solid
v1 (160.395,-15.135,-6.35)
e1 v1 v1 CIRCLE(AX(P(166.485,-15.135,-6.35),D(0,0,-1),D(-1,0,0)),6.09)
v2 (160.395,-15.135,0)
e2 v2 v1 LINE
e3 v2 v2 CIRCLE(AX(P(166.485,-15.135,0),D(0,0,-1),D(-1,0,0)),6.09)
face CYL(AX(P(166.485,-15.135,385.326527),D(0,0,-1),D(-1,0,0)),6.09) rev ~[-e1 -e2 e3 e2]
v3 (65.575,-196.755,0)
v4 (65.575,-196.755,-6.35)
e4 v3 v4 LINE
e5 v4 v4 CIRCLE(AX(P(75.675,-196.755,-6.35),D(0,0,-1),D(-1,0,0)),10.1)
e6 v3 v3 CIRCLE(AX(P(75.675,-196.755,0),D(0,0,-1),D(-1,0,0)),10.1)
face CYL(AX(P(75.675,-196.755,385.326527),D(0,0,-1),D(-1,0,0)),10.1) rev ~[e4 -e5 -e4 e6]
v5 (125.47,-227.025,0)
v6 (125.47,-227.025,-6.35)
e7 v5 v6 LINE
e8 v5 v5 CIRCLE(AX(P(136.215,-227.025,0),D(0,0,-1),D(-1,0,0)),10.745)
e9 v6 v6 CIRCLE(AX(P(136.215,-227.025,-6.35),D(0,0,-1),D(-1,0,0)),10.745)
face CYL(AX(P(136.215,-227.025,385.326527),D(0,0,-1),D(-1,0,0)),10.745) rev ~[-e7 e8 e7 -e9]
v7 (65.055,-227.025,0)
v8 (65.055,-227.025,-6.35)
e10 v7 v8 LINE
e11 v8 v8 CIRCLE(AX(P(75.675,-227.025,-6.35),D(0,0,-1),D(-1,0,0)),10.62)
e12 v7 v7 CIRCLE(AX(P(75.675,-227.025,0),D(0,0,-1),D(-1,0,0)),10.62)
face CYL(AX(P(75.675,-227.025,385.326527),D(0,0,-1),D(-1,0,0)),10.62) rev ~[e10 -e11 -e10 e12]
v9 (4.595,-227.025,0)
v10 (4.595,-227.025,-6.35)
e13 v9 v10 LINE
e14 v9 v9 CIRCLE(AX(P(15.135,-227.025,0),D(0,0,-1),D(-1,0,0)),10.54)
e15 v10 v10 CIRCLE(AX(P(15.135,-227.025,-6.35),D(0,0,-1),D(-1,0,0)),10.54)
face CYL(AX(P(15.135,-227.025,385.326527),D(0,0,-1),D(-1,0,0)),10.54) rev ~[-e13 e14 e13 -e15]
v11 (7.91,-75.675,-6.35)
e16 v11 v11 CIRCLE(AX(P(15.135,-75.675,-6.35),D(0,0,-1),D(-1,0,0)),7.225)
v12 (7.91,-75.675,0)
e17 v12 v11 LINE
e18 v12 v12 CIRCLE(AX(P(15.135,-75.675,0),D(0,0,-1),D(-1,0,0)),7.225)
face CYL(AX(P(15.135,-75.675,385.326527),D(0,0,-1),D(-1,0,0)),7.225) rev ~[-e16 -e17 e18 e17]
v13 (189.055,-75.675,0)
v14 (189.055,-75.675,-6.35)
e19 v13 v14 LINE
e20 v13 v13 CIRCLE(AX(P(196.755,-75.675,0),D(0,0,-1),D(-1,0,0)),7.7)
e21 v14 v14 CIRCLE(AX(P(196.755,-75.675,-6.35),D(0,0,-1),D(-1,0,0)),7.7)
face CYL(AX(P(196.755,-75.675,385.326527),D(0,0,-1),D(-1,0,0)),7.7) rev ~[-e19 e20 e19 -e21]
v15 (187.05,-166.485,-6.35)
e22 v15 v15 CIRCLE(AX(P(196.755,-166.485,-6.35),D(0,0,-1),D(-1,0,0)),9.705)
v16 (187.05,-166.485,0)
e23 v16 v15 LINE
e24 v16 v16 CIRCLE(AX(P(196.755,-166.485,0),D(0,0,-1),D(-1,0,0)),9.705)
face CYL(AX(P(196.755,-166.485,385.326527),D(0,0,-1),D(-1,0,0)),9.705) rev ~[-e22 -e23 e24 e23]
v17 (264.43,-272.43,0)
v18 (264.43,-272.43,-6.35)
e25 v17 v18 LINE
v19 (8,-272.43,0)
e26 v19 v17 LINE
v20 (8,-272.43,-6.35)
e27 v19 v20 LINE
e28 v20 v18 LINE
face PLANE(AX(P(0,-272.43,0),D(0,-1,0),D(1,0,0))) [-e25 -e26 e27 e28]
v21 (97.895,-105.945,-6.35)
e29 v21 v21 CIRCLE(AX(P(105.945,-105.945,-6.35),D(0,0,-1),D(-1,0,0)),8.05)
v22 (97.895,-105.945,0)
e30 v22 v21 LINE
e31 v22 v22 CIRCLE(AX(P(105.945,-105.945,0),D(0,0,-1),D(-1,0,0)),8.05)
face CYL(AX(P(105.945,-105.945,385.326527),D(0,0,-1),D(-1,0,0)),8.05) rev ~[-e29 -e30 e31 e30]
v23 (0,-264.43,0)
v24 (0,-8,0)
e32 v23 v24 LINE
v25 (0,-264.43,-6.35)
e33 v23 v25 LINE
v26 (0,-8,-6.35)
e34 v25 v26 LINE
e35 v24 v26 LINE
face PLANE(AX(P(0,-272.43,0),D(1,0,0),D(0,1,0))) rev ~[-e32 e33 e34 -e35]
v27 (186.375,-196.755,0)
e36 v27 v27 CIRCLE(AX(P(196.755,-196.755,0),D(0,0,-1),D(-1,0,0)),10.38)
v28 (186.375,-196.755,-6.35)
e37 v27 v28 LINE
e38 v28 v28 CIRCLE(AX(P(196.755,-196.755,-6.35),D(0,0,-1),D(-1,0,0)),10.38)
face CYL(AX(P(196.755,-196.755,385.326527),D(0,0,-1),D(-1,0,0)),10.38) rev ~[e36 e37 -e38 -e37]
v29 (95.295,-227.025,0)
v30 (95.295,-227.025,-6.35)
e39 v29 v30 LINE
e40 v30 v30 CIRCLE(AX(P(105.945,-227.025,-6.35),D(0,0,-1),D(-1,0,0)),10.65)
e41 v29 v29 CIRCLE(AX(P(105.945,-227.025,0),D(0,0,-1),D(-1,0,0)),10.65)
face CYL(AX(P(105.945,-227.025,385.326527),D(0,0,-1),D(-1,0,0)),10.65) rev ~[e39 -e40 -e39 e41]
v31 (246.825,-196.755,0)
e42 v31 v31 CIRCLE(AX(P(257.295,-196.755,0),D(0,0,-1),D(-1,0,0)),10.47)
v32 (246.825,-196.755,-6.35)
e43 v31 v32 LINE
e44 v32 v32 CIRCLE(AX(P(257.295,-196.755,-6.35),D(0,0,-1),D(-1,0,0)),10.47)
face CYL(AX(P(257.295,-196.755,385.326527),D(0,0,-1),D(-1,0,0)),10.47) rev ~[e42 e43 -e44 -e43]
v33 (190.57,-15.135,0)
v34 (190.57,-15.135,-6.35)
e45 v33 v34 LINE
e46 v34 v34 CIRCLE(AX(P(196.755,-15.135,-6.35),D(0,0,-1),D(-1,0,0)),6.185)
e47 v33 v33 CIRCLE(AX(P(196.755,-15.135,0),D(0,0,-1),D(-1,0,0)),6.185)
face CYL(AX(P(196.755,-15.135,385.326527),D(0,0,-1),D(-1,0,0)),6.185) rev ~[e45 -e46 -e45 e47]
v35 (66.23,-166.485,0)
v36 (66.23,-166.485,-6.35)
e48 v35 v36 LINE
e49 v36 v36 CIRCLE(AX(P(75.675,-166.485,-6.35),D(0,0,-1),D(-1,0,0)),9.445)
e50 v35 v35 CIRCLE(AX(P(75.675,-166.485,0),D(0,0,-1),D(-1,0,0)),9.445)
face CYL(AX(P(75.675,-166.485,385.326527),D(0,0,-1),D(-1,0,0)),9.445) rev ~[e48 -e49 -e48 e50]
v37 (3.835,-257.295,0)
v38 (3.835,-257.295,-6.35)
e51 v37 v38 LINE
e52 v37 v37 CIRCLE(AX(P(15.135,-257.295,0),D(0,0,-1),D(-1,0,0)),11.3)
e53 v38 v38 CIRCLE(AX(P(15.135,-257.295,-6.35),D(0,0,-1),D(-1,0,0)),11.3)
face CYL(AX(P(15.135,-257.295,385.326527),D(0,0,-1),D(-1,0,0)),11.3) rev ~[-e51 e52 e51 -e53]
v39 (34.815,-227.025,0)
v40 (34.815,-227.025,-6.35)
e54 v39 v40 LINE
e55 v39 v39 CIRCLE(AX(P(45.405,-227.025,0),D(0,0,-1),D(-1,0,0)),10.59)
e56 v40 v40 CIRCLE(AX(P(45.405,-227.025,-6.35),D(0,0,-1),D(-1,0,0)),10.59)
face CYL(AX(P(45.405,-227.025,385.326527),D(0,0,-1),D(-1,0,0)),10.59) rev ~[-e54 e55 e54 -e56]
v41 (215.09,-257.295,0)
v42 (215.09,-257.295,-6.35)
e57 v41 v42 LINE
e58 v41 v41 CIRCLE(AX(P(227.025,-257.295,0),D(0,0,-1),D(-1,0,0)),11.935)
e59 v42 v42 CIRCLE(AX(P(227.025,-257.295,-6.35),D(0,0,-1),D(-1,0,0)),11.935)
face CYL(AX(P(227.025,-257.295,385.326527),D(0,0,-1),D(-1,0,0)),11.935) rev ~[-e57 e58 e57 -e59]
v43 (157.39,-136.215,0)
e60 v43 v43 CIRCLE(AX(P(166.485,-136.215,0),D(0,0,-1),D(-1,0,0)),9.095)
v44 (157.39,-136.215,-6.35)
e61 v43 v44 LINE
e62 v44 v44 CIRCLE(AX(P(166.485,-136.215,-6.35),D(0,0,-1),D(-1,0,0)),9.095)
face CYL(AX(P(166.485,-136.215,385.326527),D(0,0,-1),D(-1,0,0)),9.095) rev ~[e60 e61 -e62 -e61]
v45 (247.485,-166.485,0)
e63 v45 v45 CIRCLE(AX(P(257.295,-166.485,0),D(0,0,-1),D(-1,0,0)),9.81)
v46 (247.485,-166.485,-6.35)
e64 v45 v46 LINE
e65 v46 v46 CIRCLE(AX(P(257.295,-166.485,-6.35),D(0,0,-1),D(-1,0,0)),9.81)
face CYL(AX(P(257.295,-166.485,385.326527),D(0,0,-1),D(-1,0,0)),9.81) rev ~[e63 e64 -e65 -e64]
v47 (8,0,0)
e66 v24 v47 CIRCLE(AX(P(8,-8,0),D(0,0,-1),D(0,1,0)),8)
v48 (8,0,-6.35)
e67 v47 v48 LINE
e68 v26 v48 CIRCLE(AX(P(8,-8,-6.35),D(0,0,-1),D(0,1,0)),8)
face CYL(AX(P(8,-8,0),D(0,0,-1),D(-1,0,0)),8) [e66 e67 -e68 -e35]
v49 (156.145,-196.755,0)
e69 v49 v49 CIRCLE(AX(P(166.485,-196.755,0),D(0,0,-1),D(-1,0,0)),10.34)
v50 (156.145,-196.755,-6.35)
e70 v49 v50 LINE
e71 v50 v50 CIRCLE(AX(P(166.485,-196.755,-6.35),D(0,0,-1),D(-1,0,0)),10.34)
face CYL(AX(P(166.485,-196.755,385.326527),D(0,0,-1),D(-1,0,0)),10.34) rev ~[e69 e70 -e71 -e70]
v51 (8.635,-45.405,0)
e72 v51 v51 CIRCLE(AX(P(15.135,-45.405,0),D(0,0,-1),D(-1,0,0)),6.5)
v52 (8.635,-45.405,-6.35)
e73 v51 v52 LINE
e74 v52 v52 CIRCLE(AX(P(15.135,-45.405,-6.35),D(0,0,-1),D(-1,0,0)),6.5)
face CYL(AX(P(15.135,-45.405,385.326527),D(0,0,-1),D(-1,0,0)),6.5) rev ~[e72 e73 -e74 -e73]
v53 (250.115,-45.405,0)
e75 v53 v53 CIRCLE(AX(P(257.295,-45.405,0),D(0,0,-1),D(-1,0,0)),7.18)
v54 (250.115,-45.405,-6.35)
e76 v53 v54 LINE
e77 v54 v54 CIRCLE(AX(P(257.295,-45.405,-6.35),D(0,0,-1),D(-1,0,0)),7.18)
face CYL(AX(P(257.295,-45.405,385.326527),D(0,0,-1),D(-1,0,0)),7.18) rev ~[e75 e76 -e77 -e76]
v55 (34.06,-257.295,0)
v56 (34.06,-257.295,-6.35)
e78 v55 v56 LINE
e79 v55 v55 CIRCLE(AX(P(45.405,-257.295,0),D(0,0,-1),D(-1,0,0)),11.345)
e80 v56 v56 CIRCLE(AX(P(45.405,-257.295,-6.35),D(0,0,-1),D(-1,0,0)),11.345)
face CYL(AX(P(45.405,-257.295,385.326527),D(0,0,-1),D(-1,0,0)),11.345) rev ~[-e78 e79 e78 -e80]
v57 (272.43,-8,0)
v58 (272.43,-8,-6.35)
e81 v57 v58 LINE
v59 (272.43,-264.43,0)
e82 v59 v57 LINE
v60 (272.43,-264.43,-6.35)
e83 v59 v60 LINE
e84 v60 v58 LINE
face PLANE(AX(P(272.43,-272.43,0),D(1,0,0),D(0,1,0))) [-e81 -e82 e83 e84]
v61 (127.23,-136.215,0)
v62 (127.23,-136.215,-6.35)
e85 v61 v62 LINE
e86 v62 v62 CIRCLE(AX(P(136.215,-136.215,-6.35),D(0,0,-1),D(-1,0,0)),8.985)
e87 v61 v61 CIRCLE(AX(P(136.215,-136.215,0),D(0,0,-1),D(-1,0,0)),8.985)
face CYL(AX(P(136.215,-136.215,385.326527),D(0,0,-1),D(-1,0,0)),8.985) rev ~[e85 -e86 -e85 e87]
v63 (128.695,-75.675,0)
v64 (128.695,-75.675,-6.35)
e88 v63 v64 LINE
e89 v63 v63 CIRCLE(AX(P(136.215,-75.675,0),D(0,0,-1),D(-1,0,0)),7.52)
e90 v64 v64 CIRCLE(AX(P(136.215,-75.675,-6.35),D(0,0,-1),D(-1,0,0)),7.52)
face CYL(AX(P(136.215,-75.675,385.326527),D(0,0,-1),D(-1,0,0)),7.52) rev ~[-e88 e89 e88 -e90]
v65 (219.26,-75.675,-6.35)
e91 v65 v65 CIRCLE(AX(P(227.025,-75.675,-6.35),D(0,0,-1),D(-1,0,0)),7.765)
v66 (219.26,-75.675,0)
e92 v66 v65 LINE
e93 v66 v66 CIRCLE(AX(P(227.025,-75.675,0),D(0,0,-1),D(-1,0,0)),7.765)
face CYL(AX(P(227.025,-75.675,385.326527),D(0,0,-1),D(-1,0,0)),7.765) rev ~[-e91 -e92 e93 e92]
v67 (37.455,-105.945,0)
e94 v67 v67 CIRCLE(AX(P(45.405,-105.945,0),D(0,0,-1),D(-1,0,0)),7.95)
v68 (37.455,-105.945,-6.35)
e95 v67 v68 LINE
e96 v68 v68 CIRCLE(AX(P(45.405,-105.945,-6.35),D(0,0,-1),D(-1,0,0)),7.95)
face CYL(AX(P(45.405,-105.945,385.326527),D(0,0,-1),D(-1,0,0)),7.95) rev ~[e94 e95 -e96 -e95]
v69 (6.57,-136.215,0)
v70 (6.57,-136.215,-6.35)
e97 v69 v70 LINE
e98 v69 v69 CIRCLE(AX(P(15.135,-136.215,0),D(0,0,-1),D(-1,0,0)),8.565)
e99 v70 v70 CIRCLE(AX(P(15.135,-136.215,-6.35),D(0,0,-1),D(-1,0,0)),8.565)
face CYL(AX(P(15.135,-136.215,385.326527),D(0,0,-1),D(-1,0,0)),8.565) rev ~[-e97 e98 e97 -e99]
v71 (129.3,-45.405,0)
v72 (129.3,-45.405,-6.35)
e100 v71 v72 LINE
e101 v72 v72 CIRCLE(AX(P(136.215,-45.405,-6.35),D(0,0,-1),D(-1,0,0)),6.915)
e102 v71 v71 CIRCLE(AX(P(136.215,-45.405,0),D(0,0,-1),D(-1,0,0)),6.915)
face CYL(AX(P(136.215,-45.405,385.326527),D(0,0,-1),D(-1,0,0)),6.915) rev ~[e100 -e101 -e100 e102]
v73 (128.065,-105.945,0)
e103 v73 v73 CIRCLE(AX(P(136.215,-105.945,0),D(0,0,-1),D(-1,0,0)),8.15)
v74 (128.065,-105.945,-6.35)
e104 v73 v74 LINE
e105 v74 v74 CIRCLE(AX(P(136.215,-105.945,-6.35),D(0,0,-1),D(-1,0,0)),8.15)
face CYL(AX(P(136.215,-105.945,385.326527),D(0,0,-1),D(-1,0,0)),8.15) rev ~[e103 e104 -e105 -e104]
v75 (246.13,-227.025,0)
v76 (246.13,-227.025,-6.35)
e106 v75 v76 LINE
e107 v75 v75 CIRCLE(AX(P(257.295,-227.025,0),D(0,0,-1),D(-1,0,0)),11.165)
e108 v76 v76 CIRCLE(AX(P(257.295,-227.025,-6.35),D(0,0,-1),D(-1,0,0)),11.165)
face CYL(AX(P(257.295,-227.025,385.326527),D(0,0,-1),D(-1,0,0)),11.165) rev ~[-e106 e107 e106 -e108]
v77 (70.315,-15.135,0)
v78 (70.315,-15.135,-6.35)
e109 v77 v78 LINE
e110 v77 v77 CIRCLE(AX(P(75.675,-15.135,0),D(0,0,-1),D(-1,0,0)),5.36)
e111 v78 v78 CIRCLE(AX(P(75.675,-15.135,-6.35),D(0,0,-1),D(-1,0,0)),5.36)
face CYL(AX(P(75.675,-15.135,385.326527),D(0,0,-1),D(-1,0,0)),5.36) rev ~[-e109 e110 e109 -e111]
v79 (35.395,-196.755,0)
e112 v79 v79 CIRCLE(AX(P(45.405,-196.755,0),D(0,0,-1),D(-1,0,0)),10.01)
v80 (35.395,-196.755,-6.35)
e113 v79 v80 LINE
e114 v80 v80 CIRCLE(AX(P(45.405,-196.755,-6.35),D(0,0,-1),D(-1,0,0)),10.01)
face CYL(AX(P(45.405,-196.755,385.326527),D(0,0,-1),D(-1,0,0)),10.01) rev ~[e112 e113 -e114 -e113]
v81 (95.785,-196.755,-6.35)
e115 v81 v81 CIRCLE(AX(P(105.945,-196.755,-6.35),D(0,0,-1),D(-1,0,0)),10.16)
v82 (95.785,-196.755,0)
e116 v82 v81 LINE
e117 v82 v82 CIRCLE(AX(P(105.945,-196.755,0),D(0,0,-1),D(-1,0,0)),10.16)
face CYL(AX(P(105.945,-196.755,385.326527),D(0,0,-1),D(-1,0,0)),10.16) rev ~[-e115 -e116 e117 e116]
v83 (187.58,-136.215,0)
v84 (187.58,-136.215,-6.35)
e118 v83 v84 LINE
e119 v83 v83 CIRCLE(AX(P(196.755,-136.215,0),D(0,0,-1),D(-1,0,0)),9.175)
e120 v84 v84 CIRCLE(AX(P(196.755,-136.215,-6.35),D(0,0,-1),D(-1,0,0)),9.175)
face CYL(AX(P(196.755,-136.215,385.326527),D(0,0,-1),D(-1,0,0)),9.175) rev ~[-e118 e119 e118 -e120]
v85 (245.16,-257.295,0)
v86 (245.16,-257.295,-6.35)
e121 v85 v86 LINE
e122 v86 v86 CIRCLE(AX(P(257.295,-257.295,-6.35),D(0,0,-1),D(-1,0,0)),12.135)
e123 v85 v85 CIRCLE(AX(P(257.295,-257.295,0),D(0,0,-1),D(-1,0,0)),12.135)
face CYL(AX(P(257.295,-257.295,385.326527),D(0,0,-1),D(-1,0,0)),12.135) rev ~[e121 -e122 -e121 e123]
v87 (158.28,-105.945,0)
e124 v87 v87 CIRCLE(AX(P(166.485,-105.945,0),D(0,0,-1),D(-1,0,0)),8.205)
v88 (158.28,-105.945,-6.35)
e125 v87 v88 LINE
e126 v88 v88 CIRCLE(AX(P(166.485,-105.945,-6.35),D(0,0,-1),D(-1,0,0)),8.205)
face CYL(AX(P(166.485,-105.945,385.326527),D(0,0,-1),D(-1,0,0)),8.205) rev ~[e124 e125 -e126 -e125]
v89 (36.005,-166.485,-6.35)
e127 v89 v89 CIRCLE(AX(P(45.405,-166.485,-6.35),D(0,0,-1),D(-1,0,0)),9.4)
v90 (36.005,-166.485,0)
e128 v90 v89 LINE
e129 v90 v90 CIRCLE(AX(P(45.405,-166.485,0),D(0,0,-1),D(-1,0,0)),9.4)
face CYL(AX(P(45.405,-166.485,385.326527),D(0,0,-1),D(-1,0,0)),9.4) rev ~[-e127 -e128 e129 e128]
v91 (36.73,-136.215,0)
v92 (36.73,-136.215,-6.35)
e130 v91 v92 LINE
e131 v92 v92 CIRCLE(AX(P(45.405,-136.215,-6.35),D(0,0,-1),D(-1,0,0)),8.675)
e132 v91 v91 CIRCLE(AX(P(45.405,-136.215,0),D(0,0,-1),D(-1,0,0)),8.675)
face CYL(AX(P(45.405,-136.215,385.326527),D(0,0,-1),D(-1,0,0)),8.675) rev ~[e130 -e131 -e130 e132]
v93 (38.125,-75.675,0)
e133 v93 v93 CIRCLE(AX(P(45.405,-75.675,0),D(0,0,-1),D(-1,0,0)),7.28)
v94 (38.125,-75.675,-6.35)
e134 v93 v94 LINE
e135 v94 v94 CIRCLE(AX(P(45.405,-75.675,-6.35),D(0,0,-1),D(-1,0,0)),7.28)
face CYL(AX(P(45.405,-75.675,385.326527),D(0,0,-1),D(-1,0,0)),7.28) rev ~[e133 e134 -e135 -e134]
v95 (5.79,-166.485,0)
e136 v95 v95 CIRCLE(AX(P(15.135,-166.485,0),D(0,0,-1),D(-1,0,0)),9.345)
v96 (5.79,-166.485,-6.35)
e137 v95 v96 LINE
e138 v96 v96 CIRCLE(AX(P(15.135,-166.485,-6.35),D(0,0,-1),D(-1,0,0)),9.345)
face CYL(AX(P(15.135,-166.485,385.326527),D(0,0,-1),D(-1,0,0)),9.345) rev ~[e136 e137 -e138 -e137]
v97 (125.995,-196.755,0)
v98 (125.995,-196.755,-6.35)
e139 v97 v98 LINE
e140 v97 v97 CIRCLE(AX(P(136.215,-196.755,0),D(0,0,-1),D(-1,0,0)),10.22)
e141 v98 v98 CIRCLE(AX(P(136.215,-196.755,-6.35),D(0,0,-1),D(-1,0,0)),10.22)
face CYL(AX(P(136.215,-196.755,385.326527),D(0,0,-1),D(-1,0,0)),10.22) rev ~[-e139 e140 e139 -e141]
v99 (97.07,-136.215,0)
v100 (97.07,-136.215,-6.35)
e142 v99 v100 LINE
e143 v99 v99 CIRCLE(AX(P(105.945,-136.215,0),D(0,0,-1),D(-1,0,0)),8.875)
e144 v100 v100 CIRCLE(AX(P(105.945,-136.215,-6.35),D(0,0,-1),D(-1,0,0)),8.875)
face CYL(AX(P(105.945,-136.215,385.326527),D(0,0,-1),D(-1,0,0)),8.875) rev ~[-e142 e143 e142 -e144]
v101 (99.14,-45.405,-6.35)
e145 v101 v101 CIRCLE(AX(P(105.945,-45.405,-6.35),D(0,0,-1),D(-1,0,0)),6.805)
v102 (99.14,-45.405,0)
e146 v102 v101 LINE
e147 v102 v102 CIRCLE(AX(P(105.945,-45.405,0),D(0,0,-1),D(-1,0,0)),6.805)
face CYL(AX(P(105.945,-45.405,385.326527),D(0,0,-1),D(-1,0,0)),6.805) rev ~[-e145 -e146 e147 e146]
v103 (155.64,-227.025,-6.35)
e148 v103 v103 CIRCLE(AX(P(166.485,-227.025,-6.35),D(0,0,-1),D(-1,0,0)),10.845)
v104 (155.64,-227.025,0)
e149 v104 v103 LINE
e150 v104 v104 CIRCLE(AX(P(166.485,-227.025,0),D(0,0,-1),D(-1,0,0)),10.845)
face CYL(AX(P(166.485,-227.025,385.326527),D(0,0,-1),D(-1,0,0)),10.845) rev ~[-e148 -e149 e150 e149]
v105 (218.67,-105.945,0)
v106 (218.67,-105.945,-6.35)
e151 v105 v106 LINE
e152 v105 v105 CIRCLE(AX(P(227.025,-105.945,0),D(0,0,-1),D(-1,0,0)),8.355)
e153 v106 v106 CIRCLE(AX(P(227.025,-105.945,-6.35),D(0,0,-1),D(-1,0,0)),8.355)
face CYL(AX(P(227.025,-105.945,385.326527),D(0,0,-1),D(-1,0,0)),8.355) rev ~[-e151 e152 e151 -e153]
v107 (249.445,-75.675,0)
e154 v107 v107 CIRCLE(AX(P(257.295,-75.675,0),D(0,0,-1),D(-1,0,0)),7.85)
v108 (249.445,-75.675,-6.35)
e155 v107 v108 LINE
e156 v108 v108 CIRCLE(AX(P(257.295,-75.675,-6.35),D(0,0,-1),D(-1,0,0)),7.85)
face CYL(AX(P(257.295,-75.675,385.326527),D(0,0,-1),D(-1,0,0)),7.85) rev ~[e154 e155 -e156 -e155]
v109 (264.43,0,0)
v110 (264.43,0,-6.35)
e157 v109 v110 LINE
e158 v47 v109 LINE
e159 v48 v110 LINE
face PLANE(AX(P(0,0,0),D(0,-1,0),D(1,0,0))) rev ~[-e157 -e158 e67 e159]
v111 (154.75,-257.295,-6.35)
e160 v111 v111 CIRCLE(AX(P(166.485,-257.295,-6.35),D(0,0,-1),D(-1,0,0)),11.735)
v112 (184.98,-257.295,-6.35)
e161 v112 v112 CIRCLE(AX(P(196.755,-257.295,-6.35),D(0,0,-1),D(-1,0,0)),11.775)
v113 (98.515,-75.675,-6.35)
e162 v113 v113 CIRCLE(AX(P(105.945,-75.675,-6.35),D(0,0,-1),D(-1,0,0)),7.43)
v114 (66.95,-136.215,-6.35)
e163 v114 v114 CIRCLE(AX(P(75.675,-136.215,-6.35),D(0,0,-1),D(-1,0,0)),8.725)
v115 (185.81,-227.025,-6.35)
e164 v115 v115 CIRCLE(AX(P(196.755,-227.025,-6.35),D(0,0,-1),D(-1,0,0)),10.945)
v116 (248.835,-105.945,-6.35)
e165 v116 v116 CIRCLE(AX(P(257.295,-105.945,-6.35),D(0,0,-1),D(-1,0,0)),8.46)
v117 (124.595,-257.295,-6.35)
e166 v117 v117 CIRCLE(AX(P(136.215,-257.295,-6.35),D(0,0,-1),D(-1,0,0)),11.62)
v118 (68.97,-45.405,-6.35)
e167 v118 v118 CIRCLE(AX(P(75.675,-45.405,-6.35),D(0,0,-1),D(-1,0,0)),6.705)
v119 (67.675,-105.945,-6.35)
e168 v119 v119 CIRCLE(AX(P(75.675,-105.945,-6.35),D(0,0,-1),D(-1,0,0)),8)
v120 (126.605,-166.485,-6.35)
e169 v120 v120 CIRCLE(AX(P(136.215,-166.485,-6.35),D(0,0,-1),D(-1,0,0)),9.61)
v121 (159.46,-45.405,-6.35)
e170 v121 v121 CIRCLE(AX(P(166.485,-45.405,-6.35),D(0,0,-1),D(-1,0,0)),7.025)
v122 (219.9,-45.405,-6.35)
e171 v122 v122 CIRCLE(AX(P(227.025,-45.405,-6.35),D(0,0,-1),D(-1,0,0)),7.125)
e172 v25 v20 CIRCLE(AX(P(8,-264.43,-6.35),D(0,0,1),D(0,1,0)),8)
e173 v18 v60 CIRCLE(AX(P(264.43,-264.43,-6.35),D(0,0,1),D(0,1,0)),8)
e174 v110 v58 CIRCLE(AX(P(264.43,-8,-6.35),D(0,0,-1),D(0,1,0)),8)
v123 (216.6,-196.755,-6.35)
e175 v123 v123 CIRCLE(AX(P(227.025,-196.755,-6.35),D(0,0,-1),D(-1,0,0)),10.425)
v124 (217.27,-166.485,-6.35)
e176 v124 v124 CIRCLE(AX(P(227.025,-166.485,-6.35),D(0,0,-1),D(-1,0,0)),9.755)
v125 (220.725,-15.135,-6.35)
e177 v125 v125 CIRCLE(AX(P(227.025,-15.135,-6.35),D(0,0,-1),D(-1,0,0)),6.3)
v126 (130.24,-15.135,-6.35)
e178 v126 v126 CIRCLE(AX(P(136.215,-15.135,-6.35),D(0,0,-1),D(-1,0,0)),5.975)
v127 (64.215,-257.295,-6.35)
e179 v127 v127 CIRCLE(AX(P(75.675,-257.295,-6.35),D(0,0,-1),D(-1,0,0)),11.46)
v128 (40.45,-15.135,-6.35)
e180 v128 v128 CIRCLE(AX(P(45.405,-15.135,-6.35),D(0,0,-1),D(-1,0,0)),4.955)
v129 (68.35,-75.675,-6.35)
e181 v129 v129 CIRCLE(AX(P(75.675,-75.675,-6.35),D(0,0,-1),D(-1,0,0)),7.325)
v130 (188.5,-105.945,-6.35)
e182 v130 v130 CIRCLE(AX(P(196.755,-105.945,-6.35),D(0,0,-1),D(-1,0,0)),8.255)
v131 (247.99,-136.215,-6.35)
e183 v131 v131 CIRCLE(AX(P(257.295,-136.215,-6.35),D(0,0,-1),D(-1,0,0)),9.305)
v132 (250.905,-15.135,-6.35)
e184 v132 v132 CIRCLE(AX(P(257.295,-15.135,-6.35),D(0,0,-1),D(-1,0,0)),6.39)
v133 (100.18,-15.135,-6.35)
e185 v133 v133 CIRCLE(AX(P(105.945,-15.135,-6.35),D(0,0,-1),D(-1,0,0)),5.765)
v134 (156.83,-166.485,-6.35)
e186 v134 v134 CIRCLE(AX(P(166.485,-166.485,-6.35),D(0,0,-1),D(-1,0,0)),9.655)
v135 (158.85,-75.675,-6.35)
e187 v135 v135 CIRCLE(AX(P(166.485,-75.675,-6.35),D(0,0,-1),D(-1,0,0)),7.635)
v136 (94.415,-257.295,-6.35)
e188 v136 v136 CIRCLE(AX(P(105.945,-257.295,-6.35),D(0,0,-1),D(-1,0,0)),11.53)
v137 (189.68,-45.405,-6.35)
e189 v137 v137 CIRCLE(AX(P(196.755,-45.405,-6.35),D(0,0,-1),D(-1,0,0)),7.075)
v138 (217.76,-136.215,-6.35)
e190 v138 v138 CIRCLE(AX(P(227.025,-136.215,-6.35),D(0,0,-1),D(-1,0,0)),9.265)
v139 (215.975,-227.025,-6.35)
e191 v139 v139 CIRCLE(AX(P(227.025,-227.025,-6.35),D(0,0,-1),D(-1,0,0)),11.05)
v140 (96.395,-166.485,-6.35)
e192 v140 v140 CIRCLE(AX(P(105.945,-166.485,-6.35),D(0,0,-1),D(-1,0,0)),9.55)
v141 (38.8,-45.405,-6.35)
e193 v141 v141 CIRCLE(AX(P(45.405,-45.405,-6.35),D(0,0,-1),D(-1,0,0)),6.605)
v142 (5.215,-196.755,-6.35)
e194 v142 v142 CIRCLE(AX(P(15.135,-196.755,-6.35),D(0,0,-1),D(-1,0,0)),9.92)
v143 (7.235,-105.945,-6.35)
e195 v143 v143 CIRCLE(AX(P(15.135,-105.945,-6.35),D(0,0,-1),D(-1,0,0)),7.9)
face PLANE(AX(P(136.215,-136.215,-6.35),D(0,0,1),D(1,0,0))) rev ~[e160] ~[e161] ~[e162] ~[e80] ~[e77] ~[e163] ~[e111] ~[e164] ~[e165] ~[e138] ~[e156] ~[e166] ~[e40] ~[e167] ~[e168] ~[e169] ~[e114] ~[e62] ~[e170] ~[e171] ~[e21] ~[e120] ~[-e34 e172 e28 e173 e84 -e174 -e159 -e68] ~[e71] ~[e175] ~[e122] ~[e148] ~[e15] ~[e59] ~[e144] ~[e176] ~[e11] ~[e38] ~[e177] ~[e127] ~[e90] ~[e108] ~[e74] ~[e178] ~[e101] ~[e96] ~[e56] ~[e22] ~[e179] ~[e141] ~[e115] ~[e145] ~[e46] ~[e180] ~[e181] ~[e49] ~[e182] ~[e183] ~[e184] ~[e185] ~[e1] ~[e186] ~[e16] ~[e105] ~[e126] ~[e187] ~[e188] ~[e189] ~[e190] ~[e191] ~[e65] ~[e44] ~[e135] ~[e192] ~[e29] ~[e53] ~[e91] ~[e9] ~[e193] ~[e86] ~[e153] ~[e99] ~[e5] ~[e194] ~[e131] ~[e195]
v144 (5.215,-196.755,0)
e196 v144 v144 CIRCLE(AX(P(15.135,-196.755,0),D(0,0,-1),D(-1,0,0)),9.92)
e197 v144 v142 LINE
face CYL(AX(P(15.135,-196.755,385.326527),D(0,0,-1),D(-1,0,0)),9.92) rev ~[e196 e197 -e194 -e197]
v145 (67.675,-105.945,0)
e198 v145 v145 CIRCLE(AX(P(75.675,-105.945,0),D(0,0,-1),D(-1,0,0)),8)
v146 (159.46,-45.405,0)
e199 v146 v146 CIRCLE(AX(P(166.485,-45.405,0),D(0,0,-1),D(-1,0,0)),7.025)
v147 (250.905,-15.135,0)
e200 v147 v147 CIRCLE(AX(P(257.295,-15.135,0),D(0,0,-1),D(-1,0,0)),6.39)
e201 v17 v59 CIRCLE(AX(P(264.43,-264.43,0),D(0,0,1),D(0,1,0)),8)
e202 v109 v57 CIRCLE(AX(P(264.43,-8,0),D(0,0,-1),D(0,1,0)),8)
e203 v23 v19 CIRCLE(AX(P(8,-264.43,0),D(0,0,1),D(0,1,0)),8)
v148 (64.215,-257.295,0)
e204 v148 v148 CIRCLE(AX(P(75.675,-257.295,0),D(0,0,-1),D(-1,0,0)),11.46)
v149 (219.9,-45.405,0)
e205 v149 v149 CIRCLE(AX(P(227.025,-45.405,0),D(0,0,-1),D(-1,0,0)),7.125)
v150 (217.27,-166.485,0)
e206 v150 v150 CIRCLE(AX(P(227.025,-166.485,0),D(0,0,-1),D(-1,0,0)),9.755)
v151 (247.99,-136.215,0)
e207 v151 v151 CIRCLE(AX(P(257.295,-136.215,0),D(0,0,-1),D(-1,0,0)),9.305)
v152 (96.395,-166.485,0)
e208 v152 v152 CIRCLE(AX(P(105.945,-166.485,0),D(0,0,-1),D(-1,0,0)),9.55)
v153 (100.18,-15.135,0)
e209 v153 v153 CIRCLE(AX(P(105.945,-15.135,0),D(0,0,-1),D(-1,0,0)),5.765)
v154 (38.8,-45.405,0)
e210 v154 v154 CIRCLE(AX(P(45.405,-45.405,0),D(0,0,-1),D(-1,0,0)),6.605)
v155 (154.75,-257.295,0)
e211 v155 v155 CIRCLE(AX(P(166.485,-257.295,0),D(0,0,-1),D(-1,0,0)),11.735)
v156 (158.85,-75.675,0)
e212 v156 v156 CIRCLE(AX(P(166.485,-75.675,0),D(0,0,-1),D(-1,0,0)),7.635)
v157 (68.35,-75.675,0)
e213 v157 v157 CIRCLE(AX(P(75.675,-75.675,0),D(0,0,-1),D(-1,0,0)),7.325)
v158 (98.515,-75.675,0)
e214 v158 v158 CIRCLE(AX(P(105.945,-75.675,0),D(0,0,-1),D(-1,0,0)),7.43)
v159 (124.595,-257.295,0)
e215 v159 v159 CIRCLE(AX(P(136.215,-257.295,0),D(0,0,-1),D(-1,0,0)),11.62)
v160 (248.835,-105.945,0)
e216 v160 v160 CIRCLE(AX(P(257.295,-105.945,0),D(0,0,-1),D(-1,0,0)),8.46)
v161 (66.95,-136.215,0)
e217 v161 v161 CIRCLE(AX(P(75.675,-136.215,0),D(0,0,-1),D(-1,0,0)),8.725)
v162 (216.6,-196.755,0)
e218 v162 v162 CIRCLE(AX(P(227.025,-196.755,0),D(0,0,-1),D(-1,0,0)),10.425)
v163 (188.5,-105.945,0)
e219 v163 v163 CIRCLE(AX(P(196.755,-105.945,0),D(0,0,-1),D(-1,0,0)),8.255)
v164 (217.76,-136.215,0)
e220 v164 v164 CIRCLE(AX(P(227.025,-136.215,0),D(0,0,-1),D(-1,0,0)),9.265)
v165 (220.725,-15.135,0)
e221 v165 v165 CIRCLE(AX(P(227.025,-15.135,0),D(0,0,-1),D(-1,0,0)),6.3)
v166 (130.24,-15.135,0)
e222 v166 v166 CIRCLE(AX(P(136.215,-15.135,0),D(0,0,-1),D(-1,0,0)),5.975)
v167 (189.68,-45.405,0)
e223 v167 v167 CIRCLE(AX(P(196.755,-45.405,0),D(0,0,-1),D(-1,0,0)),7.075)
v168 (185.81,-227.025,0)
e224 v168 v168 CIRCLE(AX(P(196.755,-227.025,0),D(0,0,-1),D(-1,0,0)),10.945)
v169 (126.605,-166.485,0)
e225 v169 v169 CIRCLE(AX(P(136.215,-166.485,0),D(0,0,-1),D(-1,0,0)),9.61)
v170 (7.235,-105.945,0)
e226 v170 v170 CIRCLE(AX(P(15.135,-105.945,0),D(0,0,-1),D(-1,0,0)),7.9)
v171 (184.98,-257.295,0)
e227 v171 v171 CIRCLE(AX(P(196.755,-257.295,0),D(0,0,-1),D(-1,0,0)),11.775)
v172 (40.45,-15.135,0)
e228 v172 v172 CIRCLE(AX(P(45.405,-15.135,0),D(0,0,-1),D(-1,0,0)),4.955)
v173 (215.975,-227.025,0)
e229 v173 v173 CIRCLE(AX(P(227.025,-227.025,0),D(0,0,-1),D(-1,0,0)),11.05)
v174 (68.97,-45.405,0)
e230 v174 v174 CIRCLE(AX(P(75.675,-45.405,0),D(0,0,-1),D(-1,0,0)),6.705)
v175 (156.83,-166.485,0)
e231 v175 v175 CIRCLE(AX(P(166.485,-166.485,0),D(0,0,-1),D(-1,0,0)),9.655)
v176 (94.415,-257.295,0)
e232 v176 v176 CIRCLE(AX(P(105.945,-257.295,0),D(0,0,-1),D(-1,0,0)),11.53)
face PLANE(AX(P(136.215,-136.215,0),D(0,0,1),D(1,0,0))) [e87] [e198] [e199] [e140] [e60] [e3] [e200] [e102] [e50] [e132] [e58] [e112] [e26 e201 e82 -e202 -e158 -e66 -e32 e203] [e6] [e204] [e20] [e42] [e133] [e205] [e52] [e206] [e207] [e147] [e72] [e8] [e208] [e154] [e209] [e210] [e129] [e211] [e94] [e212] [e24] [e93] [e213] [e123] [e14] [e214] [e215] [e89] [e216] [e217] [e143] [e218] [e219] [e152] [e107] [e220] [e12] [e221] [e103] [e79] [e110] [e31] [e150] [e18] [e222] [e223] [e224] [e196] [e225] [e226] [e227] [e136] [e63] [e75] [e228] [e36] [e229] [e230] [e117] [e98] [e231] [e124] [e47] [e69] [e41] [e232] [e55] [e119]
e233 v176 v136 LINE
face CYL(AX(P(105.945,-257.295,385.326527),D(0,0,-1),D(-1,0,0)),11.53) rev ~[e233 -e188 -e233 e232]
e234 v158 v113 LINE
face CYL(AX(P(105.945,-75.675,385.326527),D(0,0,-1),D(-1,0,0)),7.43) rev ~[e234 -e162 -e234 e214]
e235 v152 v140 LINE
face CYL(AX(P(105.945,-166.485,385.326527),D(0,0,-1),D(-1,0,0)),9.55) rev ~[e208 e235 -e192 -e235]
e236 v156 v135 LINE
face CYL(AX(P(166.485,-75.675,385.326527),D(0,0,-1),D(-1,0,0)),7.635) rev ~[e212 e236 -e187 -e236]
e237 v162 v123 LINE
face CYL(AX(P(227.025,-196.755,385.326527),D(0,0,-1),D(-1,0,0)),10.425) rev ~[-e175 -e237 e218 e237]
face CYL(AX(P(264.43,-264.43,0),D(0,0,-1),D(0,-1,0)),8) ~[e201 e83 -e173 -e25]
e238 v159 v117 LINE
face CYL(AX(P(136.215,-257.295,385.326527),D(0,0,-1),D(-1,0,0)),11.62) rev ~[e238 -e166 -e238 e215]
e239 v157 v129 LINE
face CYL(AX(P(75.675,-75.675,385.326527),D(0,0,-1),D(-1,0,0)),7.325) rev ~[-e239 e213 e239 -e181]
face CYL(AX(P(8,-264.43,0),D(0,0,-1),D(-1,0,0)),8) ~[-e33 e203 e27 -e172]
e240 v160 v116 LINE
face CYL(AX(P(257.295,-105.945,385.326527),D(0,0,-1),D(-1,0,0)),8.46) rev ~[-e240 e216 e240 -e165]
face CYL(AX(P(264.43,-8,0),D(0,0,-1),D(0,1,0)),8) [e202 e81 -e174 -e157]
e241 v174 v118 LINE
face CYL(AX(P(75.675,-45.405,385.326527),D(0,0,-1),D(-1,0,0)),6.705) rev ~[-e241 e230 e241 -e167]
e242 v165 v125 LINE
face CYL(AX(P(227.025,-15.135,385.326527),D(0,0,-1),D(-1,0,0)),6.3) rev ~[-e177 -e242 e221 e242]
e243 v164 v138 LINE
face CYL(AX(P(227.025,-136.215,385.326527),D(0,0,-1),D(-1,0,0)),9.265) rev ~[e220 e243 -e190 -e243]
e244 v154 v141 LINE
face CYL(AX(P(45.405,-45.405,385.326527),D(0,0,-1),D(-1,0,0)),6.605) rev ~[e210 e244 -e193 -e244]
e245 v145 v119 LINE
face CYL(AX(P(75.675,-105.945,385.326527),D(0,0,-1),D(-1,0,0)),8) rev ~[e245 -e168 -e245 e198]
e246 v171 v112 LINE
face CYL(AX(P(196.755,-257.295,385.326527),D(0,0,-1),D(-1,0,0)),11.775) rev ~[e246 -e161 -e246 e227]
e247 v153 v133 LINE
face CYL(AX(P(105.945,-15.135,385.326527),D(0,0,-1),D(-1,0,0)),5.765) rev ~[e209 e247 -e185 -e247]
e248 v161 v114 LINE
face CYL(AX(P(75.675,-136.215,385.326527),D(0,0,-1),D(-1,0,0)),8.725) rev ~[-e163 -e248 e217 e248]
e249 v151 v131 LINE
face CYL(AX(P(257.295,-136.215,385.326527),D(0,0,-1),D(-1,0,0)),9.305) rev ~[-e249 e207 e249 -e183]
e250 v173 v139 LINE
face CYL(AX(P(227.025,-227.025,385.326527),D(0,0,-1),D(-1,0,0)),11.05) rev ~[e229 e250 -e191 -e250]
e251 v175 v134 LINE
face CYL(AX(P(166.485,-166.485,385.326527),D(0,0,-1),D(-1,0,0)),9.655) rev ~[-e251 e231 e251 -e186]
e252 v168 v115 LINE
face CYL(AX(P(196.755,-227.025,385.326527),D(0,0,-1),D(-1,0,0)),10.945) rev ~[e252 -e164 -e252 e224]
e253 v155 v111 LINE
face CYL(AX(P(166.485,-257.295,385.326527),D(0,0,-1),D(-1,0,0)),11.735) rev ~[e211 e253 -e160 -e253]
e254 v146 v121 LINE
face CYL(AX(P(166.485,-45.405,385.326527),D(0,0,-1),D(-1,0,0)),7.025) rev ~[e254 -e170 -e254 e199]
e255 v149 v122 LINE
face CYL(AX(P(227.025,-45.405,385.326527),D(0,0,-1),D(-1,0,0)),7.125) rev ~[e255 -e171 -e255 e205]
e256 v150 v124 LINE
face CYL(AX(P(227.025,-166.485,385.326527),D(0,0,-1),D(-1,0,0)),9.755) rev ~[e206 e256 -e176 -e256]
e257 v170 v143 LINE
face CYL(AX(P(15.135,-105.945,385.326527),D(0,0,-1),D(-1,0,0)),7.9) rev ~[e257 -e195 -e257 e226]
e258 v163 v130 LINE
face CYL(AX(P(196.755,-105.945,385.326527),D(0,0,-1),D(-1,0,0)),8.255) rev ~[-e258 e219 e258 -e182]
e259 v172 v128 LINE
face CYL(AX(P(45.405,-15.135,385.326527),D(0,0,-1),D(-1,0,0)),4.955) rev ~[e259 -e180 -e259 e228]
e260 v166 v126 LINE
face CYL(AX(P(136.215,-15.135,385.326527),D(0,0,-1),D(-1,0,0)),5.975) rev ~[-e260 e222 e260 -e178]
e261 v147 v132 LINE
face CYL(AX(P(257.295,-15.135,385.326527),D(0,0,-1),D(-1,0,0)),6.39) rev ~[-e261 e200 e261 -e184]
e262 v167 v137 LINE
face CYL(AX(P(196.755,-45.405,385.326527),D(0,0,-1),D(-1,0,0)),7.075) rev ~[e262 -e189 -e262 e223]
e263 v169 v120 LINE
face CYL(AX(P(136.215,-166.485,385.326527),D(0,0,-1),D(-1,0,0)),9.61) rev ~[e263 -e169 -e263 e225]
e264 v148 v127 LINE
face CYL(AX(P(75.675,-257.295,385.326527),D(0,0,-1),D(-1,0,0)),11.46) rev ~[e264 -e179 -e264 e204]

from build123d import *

# Parameters (mm, degrees)
F1_W     = 272.43
F1_H     = 272.43
F2_DEPTH = 6.35
F3_D     = 9.91
F4_D     = 10.72
F5_D     = 11.53
F6_D     = 11.95
F7_D     = 12.18
F8_D     = 12.37
F9_D     = 12.6
F10_D    = 12.78
F11_D    = 13
F12_D    = 13.21
F13_D    = 13.41
F14_D    = 13.61
F15_D    = 13.83
F16_D    = 14.05
F17_D    = 14.15
F18_D    = 14.25
F19_D    = 14.36
F20_D    = 14.45
F21_D    = 14.56
F22_D    = 14.65
F23_D    = 14.86
F24_D    = 15.04
F25_D    = 15.27
F26_D    = 15.4
F27_D    = 15.53
F28_D    = 15.7
F29_D    = 15.8
F30_D    = 15.9
F31_D    = 16
F32_D    = 16.1
F33_D    = 16.3
F34_D    = 16.41
F35_D    = 16.51
F36_D    = 16.71
F37_D    = 16.92
F38_D    = 17.13
F39_D    = 17.35
F40_R    = 8
F41_D    = 17.45
F42_D    = 17.75
F43_D    = 17.97
F44_D    = 18.19
F45_D    = 18.35
F46_D    = 18.53
F47_D    = 18.61
F48_D    = 18.69
F49_D    = 18.8
F50_D    = 18.89
F51_D    = 19.1
F52_D    = 19.22
F53_D    = 19.31
F54_D    = 19.41
F55_D    = 19.51
F56_D    = 19.62
F57_D    = 19.84
F58_D    = 20.02
F59_D    = 20.2
F60_D    = 20.32
F61_D    = 20.44
F62_D    = 20.68
F63_D    = 20.76
F64_D    = 20.85
F65_D    = 20.94
F66_D    = 21.08
F67_D    = 21.18
F68_D    = 21.24
F69_D    = 21.3
F70_D    = 21.49
F71_D    = 21.69
F72_D    = 21.89
F73_D    = 22.1
F74_D    = 22.33
F75_D    = 22.6
F76_D    = 22.69
F77_D    = 22.92
F78_D    = 23.06
F79_D    = 23.24
F80_D    = 23.47
F81_D    = 23.55
F82_D    = 23.87
F83_D    = 24.27


# Not quite as in the source:
# - a length typed as a fraction of an inch, garbled in the dataset ("3 / 203.2 mm" for 3/8 in), is restored


with BuildPart() as f2:
    # F1 (on Top) → F2 (new body)
    with BuildSketch(Plane.XY):
        with Locations((136.215, -136.215)):
            Rectangle(F1_W, F1_H)
    extrude(amount=-F2_DEPTH)

    # F3 (through all)
    with Locations(Plane.XY):
        with Locations((45.405, -15.135)):
            Hole(F3_D / 2)

    # F4 (through all)
    with Locations(Plane.XY):
        with Locations((75.675, -15.135)):
            Hole(F4_D / 2)

    # F5 (through all)
    with Locations(Plane.XY):
        with Locations((105.945, -15.135)):
            Hole(F5_D / 2)

    # F6 (through all)
    with Locations(Plane.XY):
        with Locations((136.215, -15.135)):
            Hole(F6_D / 2)

    # F7 (through all)
    with Locations(Plane.XY):
        with Locations((166.485, -15.135)):
            Hole(F7_D / 2)

    # F8 (through all)
    with Locations(Plane.XY):
        with Locations((196.755, -15.135)):
            Hole(F8_D / 2)

    # F9 (through all)
    with Locations(Plane.XY):
        with Locations((227.025, -15.135)):
            Hole(F9_D / 2)

    # F10 (through all)
    with Locations(Plane.XY):
        with Locations((257.295, -15.135)):
            Hole(F10_D / 2)

    # F11 (through all)
    with Locations(Plane.XY):
        with Locations((15.135, -45.405)):
            Hole(F11_D / 2)

    # F12 (through all)
    with Locations(Plane.XY):
        with Locations((45.405, -45.405)):
            Hole(F12_D / 2)

    # F13 (through all)
    with Locations(Plane.XY):
        with Locations((75.675, -45.405)):
            Hole(F13_D / 2)

    # F14 (through all)
    with Locations(Plane.XY):
        with Locations((105.945, -45.405)):
            Hole(F14_D / 2)

    # F15 (through all)
    with Locations(Plane.XY):
        with Locations((136.215, -45.405)):
            Hole(F15_D / 2)

    # F16 (through all)
    with Locations(Plane.XY):
        with Locations((166.485, -45.405)):
            Hole(F16_D / 2)

    # F17 (through all)
    with Locations(Plane.XY):
        with Locations((196.755, -45.405)):
            Hole(F17_D / 2)

    # F18 (through all)
    with Locations(Plane.XY):
        with Locations((227.025, -45.405)):
            Hole(F18_D / 2)

    # F19 (through all)
    with Locations(Plane.XY):
        with Locations((257.295, -45.405)):
            Hole(F19_D / 2)

    # F20 (through all)
    with Locations(Plane.XY):
        with Locations((15.135, -75.675)):
            Hole(F20_D / 2)

    # F21 (through all)
    with Locations(Plane.XY):
        with Locations((45.405, -75.675)):
            Hole(F21_D / 2)

    # F22 (through all)
    with Locations(Plane.XY):
        with Locations((75.675, -75.675)):
            Hole(F22_D / 2)

    # F23 (through all)
    with Locations(Plane.XY):
        with Locations((105.945, -75.675)):
            Hole(F23_D / 2)

    # F24 (through all)
    with Locations(Plane.XY):
        with Locations((136.215, -75.675)):
            Hole(F24_D / 2)

    # F25 (through all)
    with Locations(Plane.XY):
        with Locations((166.485, -75.675)):
            Hole(F25_D / 2)

    # F26 (through all)
    with Locations(Plane.XY):
        with Locations((196.755, -75.675)):
            Hole(F26_D / 2)

    # F27 (through all)
    with Locations(Plane.XY):
        with Locations((227.025, -75.675)):
            Hole(F27_D / 2)

    # F28 (through all)
    with Locations(Plane.XY):
        with Locations((257.295, -75.675)):
            Hole(F28_D / 2)

    # F29 (through all)
    with Locations(Plane.XY):
        with Locations((15.135, -105.945)):
            Hole(F29_D / 2)

    # F30 (through all)
    with Locations(Plane.XY):
        with Locations((45.405, -105.945)):
            Hole(F30_D / 2)

    # F31 (through all)
    with Locations(Plane.XY):
        with Locations((75.675, -105.945)):
            Hole(F31_D / 2)

    # F32 (through all)
    with Locations(Plane.XY):
        with Locations((105.945, -105.945)):
            Hole(F32_D / 2)

    # F33 (through all)
    with Locations(Plane.XY):
        with Locations((136.215, -105.945)):
            Hole(F33_D / 2)

    # F34 (through all)
    with Locations(Plane.XY):
        with Locations((166.485, -105.945)):
            Hole(F34_D / 2)

    # F35 (through all)
    with Locations(Plane.XY):
        with Locations((196.755, -105.945)):
            Hole(F35_D / 2)

    # F36 (through all)
    with Locations(Plane.XY):
        with Locations((227.025, -105.945)):
            Hole(F36_D / 2)

    # F37 (through all)
    with Locations(Plane.XY):
        with Locations((257.295, -105.945)):
            Hole(F37_D / 2)

    # F38 (through all)
    with Locations(Plane.XY):
        with Locations((15.135, -136.215)):
            Hole(F38_D / 2)

    # F39 (through all)
    with Locations(Plane.XY):
        with Locations((45.405, -136.215)):
            Hole(F39_D / 2)

    # F40
    f40_edges = [f2.edges().sort_by_distance(p)[0] for p in [
        (0, 0, -3.175),
        (272.43, 0, -3.175),
        (272.43, -272.43, -3.175),
        (0, -272.43, -3.175),
    ]]
    fillet(f40_edges, radius=F40_R)

    # F41 (through all)
    with Locations(Plane.XY):
        with Locations((75.675, -136.215)):
            Hole(F41_D / 2)

    # F42 (through all)
    with Locations(Plane.XY):
        with Locations((105.945, -136.215)):
            Hole(F42_D / 2)

    # F43 (through all)
    with Locations(Plane.XY):
        with Locations((136.215, -136.215)):
            Hole(F43_D / 2)

    # F44 (through all)
    with Locations(Plane.XY):
        with Locations((166.485, -136.215)):
            Hole(F44_D / 2)

    # F45 (through all)
    with Locations(Plane.XY):
        with Locations((196.755, -136.215)):
            Hole(F45_D / 2)

    # F46 (through all)
    with Locations(Plane.XY):
        with Locations((227.025, -136.215)):
            Hole(F46_D / 2)

    # F47 (through all)
    with Locations(Plane.XY):
        with Locations((257.295, -136.215)):
            Hole(F47_D / 2)

    # F48 (through all)
    with Locations(Plane.XY):
        with Locations((15.135, -166.485)):
            Hole(F48_D / 2)

    # F49 (through all)
    with Locations(Plane.XY):
        with Locations((45.405, -166.485)):
            Hole(F49_D / 2)

    # F50 (through all)
    with Locations(Plane.XY):
        with Locations((75.675, -166.485)):
            Hole(F50_D / 2)

    # F51 (through all)
    with Locations(Plane.XY):
        with Locations((105.945, -166.485)):
            Hole(F51_D / 2)

    # F52 (through all)
    with Locations(Plane.XY):
        with Locations((136.215, -166.485)):
            Hole(F52_D / 2)

    # F53 (through all)
    with Locations(Plane.XY):
        with Locations((166.485, -166.485)):
            Hole(F53_D / 2)

    # F54 (through all)
    with Locations(Plane.XY):
        with Locations((196.755, -166.485)):
            Hole(F54_D / 2)

    # F55 (through all)
    with Locations(Plane.XY):
        with Locations((227.025, -166.485)):
            Hole(F55_D / 2)

    # F56 (through all)
    with Locations(Plane.XY):
        with Locations((257.295, -166.485)):
            Hole(F56_D / 2)

    # F57 (through all)
    with Locations(Plane.XY):
        with Locations((15.135, -196.755)):
            Hole(F57_D / 2)

    # F58 (through all)
    with Locations(Plane.XY):
        with Locations((45.405, -196.755)):
            Hole(F58_D / 2)

    # F59 (through all)
    with Locations(Plane.XY):
        with Locations((75.675, -196.755)):
            Hole(F59_D / 2)

    # F60 (through all)
    with Locations(Plane.XY):
        with Locations((105.945, -196.755)):
            Hole(F60_D / 2)

    # F61 (through all)
    with Locations(Plane.XY):
        with Locations((136.215, -196.755)):
            Hole(F61_D / 2)

    # F62 (through all)
    with Locations(Plane.XY):
        with Locations((166.485, -196.755)):
            Hole(F62_D / 2)

    # F63 (through all)
    with Locations(Plane.XY):
        with Locations((196.755, -196.755)):
            Hole(F63_D / 2)

    # F64 (through all)
    with Locations(Plane.XY):
        with Locations((227.025, -196.755)):
            Hole(F64_D / 2)

    # F65 (through all)
    with Locations(Plane.XY):
        with Locations((257.295, -196.755)):
            Hole(F65_D / 2)

    # F66 (through all)
    with Locations(Plane.XY):
        with Locations((15.135, -227.025)):
            Hole(F66_D / 2)

    # F67 (through all)
    with Locations(Plane.XY):
        with Locations((45.405, -227.025)):
            Hole(F67_D / 2)

    # F68 (through all)
    with Locations(Plane.XY):
        with Locations((75.675, -227.025)):
            Hole(F68_D / 2)

    # F69 (through all)
    with Locations(Plane.XY):
        with Locations((105.945, -227.025)):
            Hole(F69_D / 2)

    # F70 (through all)
    with Locations(Plane.XY):
        with Locations((136.215, -227.025)):
            Hole(F70_D / 2)

    # F71 (through all)
    with Locations(Plane.XY):
        with Locations((166.485, -227.025)):
            Hole(F71_D / 2)

    # F72 (through all)
    with Locations(Plane.XY):
        with Locations((196.755, -227.025)):
            Hole(F72_D / 2)

    # F73 (through all)
    with Locations(Plane.XY):
        with Locations((227.025, -227.025)):
            Hole(F73_D / 2)

    # F74 (through all)
    with Locations(Plane.XY):
        with Locations((257.295, -227.025)):
            Hole(F74_D / 2)

    # F75 (through all)
    with Locations(Plane.XY):
        with Locations((15.135, -257.295)):
            Hole(F75_D / 2)

    # F76 (through all)
    with Locations(Plane.XY):
        with Locations((45.405, -257.295)):
            Hole(F76_D / 2)

    # F77 (through all)
    with Locations(Plane.XY):
        with Locations((75.675, -257.295)):
            Hole(F77_D / 2)

    # F78 (through all)
    with Locations(Plane.XY):
        with Locations((105.945, -257.295)):
            Hole(F78_D / 2)

    # F79 (through all)
    with Locations(Plane.XY):
        with Locations((136.215, -257.295)):
            Hole(F79_D / 2)

    # F80 (through all)
    with Locations(Plane.XY):
        with Locations((166.485, -257.295)):
            Hole(F80_D / 2)

    # F81 (through all)
    with Locations(Plane.XY):
        with Locations((196.755, -257.295)):
            Hole(F81_D / 2)

    # F82 (through all)
    with Locations(Plane.XY):
        with Locations((227.025, -257.295)):
            Hole(F82_D / 2)

    # F83 (through all)
    with Locations(Plane.XY):
        with Locations((257.295, -257.295)):
            Hole(F83_D / 2)


solid = f2.part
